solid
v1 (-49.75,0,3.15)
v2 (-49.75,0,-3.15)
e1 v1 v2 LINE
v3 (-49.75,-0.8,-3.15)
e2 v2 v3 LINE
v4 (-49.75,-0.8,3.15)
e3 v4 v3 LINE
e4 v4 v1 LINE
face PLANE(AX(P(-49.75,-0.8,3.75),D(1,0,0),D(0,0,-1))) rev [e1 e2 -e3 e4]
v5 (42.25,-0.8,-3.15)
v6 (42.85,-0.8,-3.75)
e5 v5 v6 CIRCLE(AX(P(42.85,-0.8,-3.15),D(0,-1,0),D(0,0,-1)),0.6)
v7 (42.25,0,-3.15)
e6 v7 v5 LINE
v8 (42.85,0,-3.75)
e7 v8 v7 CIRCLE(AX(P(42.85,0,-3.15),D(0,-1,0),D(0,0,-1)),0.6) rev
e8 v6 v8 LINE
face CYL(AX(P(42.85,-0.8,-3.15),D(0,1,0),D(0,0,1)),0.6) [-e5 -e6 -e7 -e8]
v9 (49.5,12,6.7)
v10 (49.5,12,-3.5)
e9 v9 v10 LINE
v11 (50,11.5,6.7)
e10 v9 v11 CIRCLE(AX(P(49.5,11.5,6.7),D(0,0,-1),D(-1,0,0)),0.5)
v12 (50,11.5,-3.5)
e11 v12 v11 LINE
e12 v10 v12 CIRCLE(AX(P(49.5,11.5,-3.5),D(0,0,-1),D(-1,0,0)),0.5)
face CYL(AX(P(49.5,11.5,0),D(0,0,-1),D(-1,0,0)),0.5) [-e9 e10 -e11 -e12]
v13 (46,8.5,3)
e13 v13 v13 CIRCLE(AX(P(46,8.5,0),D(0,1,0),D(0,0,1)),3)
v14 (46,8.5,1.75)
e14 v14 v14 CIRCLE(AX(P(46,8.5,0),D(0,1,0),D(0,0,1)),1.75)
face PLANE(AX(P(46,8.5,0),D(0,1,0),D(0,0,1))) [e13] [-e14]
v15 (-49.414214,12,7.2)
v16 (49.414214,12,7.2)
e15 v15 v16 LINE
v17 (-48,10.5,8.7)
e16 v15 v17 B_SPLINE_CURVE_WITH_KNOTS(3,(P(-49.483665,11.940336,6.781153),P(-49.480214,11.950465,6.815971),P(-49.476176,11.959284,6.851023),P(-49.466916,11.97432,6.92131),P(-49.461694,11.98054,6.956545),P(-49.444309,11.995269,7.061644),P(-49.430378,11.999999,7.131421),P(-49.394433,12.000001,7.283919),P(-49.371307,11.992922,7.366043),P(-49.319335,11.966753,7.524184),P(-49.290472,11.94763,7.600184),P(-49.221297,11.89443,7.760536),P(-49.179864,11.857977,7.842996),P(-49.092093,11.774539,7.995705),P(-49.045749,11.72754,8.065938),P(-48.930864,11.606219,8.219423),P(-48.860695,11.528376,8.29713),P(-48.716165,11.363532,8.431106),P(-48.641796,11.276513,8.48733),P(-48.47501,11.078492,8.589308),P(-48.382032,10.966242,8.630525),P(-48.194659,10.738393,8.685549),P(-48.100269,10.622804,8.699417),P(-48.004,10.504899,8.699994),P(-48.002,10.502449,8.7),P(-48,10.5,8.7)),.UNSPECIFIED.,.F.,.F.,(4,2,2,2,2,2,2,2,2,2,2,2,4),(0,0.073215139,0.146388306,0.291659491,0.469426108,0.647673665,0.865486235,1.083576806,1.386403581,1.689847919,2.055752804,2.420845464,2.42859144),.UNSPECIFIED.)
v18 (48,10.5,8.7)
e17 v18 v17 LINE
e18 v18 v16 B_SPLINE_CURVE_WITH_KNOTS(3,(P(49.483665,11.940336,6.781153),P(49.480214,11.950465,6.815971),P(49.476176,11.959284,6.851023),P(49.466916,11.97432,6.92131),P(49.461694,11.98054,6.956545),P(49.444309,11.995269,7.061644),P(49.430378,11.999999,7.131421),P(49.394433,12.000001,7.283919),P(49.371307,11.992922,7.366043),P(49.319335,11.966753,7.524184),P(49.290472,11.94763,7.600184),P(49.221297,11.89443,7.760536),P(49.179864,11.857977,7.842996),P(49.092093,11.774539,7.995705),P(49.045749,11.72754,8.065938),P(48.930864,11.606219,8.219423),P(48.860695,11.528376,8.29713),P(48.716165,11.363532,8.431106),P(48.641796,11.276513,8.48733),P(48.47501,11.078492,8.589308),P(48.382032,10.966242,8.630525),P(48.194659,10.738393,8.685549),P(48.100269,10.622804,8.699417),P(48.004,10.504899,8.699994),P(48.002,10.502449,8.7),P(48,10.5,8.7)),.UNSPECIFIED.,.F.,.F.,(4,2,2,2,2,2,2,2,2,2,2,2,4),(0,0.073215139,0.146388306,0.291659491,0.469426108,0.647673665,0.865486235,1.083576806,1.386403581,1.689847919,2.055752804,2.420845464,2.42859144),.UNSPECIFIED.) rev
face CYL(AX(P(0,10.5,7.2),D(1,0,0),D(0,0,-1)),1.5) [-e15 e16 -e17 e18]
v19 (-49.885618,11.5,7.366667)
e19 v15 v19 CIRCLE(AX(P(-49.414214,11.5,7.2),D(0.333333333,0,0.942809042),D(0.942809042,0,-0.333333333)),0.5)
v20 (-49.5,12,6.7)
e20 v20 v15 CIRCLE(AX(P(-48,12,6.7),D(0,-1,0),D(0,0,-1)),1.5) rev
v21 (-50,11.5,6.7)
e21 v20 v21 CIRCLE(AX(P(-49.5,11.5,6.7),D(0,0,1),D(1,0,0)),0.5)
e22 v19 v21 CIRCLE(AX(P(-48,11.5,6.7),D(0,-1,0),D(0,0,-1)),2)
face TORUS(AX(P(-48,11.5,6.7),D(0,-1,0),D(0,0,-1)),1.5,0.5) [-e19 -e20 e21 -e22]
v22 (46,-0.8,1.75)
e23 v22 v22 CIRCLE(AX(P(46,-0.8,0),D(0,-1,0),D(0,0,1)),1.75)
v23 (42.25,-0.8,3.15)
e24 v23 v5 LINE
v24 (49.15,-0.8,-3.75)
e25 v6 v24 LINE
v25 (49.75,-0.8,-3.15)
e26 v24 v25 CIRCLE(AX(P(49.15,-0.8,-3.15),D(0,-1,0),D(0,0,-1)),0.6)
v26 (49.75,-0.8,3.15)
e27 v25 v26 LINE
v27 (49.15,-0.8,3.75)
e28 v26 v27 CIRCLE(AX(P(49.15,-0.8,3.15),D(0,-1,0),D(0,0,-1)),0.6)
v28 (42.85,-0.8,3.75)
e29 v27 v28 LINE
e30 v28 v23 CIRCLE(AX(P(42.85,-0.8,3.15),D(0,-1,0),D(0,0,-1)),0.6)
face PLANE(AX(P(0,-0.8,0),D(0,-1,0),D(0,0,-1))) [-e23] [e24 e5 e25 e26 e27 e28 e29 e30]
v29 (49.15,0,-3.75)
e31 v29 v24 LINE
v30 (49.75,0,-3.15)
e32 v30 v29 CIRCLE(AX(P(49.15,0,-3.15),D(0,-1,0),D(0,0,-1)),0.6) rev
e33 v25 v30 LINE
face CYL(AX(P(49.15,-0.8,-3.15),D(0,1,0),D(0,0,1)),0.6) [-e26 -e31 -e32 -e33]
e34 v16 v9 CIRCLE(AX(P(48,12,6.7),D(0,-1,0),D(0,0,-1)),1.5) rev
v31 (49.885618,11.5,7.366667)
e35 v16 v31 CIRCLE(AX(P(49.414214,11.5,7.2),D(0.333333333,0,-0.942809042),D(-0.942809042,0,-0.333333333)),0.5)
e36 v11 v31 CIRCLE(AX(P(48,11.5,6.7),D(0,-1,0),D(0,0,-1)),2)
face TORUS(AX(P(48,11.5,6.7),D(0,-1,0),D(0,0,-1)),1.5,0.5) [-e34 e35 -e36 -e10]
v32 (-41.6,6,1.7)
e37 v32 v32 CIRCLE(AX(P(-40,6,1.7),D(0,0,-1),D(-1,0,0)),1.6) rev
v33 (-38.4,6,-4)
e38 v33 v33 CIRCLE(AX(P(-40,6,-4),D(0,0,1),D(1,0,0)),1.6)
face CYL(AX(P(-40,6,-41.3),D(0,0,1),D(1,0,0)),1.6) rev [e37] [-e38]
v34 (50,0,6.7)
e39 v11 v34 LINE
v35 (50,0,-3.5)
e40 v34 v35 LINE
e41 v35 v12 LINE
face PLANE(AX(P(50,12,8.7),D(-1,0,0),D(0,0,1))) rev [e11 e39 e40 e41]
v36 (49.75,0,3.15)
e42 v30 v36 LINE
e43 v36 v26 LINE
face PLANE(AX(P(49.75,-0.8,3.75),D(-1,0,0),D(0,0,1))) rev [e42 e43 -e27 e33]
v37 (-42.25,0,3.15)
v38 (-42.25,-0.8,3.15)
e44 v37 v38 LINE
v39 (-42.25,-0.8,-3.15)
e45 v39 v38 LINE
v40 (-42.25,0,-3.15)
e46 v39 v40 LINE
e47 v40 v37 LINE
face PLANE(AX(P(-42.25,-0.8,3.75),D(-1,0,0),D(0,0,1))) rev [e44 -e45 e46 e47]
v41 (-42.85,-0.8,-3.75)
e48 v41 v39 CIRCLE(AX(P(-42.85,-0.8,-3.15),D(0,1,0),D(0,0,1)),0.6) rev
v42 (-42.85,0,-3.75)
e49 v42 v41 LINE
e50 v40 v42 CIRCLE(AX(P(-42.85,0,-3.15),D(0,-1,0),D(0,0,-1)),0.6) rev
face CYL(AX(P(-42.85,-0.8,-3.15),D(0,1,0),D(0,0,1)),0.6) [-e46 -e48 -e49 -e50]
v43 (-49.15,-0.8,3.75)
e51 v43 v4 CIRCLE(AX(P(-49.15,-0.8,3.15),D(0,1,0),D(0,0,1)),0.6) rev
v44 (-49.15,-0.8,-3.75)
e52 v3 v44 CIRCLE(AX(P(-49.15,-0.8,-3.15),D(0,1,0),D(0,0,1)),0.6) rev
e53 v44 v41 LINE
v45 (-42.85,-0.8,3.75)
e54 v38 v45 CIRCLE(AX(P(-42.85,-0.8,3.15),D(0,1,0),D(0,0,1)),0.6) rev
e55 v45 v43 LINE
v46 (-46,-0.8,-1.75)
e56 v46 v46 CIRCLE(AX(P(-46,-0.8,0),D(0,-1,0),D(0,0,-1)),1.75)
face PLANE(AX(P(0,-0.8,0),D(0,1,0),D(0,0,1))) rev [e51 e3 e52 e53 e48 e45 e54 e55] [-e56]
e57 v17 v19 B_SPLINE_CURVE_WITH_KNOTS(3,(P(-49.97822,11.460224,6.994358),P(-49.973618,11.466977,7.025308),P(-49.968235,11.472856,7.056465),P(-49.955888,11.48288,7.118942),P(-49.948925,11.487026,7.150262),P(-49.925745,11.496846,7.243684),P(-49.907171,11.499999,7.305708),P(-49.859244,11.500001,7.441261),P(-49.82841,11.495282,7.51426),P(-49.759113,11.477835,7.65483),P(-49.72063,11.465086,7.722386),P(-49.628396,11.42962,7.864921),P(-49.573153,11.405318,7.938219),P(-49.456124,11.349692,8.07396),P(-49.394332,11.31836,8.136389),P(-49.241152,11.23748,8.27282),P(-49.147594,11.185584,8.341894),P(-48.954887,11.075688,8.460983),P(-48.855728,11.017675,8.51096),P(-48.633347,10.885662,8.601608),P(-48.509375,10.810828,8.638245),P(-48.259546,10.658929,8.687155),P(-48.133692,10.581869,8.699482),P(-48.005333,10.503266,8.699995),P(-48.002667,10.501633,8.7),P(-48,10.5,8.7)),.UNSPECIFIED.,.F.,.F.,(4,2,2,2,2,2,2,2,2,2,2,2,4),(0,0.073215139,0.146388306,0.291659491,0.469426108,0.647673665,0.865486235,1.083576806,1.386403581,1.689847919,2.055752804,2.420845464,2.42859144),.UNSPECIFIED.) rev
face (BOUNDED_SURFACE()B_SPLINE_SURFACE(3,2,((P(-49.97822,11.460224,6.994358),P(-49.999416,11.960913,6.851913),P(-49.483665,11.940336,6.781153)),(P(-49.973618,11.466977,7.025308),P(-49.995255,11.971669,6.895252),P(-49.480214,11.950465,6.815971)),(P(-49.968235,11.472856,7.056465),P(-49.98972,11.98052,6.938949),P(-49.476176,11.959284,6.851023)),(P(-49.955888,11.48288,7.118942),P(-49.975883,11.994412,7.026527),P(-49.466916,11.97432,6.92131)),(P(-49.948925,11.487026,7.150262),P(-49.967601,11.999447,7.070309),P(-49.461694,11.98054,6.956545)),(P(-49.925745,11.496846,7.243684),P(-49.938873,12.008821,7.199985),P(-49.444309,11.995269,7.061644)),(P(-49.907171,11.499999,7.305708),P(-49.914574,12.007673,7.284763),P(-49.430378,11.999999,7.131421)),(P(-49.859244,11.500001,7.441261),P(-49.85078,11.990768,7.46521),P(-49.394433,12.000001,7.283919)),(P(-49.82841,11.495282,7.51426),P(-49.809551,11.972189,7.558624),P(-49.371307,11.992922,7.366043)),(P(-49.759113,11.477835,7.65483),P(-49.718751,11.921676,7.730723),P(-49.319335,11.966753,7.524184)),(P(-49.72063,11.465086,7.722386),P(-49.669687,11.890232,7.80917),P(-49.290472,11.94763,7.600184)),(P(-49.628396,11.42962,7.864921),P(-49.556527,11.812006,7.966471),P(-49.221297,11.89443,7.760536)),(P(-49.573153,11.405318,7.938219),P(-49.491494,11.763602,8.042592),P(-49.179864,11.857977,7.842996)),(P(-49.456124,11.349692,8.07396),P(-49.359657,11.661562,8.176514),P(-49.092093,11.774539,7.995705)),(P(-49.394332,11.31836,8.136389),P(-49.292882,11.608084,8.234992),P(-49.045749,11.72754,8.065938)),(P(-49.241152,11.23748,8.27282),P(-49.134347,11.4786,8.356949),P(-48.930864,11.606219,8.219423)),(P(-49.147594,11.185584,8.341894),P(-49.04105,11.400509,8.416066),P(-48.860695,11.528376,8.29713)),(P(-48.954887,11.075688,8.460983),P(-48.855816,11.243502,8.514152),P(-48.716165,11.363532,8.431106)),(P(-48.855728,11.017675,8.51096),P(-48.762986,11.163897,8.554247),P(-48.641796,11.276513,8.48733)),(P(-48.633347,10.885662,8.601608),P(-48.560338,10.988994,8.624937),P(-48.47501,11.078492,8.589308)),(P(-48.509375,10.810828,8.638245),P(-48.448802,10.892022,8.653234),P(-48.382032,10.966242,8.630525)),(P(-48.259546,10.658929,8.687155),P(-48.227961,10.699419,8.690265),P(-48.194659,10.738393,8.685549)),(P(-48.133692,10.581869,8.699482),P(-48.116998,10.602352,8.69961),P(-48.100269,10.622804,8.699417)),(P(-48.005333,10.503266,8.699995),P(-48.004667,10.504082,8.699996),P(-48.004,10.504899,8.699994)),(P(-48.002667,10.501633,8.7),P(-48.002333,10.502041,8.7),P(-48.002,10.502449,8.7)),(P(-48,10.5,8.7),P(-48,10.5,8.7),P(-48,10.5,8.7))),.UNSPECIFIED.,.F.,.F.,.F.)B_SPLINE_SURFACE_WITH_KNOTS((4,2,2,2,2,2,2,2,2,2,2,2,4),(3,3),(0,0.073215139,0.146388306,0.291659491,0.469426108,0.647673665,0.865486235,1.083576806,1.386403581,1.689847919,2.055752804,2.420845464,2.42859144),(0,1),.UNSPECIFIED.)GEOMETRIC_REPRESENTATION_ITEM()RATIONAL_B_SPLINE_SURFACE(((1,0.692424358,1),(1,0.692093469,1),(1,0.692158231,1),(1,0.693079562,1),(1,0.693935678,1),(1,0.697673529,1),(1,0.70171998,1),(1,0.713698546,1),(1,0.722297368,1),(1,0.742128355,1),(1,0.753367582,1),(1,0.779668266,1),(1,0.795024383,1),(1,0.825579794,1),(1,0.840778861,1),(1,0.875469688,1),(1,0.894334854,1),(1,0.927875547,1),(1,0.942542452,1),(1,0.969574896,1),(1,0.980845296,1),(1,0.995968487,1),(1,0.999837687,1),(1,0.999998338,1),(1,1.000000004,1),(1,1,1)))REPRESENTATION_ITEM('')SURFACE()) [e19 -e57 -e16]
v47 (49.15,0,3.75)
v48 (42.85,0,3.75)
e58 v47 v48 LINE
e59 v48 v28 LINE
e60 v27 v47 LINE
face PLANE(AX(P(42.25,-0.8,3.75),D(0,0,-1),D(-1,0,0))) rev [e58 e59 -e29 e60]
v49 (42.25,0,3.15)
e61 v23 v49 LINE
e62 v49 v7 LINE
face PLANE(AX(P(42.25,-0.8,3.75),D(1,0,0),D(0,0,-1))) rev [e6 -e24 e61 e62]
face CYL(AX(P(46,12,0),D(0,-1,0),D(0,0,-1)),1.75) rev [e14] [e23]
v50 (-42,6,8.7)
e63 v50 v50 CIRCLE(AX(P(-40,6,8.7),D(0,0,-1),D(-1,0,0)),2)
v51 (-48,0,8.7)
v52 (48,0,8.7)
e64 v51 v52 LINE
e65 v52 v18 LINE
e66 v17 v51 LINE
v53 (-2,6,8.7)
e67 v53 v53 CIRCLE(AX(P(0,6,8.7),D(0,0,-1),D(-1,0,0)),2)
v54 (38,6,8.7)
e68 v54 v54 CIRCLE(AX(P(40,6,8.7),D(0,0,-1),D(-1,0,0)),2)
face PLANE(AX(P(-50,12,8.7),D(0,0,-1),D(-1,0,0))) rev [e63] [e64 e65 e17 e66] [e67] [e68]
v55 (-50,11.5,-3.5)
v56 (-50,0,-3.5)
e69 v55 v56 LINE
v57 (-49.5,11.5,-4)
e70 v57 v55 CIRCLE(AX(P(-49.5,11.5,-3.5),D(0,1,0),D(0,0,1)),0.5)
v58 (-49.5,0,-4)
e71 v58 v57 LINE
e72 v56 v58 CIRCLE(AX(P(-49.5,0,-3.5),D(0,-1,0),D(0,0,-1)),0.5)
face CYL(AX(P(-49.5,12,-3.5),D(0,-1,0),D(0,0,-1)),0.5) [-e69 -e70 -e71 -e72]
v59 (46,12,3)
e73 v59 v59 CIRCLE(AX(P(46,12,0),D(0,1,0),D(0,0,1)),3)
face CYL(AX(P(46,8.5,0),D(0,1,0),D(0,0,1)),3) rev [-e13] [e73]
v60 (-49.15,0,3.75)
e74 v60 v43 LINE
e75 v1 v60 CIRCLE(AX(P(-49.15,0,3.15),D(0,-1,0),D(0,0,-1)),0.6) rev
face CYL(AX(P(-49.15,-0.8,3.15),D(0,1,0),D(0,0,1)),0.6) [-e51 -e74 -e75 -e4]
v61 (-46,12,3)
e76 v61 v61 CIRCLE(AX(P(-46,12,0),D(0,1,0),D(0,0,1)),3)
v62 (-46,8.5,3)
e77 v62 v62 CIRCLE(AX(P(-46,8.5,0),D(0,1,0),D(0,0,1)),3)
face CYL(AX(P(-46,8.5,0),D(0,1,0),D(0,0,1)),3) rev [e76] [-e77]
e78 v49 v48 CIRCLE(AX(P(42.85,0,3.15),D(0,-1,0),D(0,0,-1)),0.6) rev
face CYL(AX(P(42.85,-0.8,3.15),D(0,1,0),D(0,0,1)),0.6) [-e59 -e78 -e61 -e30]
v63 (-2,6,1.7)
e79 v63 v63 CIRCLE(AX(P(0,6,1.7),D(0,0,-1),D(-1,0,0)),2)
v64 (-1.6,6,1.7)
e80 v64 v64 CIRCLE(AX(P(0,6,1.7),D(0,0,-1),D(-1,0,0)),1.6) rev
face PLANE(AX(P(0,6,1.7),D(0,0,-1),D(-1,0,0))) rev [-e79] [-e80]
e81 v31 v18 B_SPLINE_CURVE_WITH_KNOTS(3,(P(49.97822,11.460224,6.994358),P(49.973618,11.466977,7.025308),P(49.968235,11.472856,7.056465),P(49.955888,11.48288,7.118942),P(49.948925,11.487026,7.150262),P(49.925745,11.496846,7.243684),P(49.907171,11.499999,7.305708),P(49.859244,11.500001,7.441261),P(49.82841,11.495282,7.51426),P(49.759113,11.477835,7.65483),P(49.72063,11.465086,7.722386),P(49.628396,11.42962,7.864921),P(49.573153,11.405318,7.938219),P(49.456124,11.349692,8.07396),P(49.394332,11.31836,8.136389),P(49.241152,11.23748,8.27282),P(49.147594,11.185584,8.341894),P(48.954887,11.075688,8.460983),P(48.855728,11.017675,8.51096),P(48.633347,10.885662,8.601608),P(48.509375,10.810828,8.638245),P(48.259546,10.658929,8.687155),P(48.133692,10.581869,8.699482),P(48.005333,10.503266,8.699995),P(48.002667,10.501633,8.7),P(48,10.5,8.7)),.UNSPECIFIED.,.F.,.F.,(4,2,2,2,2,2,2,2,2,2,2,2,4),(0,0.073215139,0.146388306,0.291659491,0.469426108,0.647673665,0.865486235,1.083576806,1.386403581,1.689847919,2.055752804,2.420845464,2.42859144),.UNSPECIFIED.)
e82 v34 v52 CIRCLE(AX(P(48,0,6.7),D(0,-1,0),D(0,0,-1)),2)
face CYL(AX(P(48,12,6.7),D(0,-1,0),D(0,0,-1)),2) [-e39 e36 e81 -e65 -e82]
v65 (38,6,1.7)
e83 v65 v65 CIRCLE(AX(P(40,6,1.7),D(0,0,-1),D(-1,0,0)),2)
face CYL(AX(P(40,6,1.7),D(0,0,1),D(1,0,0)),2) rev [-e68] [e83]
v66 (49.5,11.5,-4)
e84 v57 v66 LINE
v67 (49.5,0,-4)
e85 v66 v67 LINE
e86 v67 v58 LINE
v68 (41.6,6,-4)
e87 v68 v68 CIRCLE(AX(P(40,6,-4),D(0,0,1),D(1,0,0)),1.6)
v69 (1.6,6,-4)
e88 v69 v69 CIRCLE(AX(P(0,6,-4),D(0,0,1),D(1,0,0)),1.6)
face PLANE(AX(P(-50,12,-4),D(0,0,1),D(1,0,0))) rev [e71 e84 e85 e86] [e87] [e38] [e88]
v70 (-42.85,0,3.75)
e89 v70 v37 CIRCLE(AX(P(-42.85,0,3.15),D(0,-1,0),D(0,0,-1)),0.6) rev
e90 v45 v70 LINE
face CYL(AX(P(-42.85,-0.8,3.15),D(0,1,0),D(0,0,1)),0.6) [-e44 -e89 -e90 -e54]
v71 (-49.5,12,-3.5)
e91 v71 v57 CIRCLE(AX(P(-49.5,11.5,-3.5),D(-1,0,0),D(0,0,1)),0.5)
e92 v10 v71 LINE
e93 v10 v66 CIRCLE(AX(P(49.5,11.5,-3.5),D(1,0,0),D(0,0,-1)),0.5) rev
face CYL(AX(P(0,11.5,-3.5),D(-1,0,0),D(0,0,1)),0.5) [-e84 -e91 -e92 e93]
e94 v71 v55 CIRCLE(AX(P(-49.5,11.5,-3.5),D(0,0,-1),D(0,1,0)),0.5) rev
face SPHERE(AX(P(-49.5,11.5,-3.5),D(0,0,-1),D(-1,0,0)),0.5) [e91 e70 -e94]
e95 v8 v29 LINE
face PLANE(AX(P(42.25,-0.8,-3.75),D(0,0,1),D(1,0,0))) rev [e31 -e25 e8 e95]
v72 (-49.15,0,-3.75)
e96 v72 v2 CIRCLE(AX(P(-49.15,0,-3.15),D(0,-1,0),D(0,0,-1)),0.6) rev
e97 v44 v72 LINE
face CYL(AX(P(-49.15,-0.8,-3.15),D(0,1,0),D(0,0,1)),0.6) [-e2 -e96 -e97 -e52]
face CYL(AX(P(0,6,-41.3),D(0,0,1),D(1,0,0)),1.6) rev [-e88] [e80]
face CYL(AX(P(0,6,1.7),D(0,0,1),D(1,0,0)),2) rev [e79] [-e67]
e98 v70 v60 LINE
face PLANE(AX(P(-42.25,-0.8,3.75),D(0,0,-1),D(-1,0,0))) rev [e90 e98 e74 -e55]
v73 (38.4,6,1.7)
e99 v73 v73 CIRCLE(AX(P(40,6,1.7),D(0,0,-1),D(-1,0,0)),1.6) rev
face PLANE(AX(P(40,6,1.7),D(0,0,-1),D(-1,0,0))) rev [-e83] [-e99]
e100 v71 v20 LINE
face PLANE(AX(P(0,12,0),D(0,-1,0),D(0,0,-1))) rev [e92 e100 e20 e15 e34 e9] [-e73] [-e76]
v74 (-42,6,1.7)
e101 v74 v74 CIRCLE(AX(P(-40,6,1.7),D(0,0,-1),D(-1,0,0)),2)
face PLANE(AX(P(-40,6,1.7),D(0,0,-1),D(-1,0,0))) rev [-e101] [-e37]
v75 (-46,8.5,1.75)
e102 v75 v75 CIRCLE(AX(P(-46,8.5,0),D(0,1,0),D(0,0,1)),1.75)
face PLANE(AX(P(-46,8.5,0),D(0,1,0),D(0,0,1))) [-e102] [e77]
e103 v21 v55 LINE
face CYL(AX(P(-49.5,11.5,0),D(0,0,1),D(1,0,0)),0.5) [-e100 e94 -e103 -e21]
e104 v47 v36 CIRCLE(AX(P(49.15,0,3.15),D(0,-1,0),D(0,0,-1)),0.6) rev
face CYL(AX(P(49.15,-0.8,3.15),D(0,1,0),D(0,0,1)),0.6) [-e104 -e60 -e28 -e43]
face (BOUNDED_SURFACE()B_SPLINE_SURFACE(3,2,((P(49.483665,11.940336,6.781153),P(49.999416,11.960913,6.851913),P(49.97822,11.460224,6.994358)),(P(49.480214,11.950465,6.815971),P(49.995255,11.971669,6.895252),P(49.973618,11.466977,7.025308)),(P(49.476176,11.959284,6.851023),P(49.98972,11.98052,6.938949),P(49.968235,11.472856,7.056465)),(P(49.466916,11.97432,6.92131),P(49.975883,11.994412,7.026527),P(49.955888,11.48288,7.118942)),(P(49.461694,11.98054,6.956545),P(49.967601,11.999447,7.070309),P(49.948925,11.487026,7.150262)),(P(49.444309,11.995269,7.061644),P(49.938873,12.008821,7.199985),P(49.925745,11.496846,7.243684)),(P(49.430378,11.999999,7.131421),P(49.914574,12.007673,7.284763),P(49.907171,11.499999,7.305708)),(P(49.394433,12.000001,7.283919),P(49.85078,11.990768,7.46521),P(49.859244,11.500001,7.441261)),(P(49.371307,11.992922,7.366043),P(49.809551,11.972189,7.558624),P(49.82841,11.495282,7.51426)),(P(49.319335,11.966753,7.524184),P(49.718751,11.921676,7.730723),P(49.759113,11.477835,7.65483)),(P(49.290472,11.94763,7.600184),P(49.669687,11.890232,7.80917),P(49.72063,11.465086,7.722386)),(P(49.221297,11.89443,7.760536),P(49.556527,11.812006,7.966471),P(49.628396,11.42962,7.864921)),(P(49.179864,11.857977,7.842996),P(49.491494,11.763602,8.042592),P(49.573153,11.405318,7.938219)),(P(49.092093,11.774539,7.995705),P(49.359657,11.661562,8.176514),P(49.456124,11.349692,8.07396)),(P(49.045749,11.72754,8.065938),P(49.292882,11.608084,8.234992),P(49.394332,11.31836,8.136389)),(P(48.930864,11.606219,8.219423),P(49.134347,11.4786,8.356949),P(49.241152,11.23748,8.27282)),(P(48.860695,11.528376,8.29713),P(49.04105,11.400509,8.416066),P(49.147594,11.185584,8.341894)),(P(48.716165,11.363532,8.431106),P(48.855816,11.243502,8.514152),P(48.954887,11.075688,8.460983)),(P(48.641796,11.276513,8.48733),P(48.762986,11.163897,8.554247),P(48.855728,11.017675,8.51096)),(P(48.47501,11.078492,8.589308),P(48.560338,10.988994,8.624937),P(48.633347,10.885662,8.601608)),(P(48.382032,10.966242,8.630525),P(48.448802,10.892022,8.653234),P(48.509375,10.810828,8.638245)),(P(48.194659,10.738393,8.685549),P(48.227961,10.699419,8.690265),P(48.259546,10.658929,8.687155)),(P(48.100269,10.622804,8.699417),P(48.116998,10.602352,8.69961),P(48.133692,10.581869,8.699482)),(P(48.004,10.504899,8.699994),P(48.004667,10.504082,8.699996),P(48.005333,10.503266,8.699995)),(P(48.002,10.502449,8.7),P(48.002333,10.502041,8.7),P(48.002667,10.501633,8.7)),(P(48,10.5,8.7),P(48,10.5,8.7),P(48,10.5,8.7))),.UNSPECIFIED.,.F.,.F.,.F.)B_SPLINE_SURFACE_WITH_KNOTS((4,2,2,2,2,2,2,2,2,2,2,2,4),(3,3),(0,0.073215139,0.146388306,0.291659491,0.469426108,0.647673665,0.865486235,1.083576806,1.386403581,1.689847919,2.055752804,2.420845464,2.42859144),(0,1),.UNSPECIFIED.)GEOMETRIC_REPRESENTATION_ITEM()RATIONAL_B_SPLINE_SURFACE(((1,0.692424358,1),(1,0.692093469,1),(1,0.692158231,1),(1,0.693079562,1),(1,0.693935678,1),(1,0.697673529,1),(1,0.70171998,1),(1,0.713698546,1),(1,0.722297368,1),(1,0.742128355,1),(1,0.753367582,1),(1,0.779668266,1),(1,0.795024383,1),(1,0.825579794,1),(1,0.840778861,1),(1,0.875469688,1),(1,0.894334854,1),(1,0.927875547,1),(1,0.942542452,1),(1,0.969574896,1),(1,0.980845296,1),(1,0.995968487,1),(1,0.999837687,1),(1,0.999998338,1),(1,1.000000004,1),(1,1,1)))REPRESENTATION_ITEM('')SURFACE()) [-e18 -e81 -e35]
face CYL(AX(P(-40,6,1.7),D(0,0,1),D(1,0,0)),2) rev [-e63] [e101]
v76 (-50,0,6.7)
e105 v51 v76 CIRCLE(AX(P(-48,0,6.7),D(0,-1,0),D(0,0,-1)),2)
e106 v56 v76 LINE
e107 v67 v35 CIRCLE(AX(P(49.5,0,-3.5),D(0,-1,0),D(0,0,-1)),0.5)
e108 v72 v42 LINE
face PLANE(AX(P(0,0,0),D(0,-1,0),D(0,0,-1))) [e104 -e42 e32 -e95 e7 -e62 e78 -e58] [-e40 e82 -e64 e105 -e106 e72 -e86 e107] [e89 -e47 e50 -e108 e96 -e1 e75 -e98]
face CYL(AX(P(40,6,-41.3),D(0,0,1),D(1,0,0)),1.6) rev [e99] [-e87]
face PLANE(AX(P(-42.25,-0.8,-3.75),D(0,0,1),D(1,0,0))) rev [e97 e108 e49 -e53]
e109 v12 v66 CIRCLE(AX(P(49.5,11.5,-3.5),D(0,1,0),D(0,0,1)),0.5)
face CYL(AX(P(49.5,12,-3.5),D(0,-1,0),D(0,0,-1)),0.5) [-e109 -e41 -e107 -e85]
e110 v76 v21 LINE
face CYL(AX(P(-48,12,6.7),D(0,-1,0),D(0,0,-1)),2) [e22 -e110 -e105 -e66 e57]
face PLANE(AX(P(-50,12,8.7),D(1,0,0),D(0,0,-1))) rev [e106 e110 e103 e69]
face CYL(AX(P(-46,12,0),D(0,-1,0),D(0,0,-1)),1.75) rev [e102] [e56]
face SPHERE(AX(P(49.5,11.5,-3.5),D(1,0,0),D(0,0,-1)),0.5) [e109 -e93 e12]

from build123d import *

# Parameters (mm, degrees)
SKETCH1_W           = 100
SKETCH1_H           = 12.7
SKETCH1_R           = 1.75
BOSS_EXTRUDE1_DEPTH = 12
SKETCH2_R           = 3
CUT_EXTRUDE1_DEPTH  = 3.5
SKETCH3_R           = 1.6
CUT_EXTRUDE2_DEPTH  = 50
SKETCH4_R           = 2
CUT_EXTRUDE3_DEPTH  = 7
FILLET1_R           = 2
FILLET2_R           = 1.5
BOSS_EXTRUDE2_START = 0.8
SKETCH5_W           = 7.5
SKETCH5_H           = 7.5
SKETCH5_R           = 1.75
BOSS_EXTRUDE2_DEPTH = 0.8
FILLET3_R           = 0.6
FILLET4_R           = 0.5


with BuildPart() as part:
    # Sketch1 → Boss-Extrude1 (new body)
    with BuildSketch(Plane(origin=(0, 0, 0), x_dir=(1, 0, 0), z_dir=(0, 1, 0))):
        with Locations((0, -2.35)):
            Rectangle(SKETCH1_W, SKETCH1_H)
        with Locations(Location((46, 0, 0), (0, 0, 270))):
            Circle(SKETCH1_R, mode=Mode.SUBTRACT)
        with Locations(Location((-46, 0, 0), (0, 0, 90))):
            Circle(SKETCH1_R, mode=Mode.SUBTRACT)
    extrude(amount=BOSS_EXTRUDE1_DEPTH)

    # Sketch2 → Cut-Extrude1 (cut)
    with BuildSketch(Plane(origin=(0, 12, 0), x_dir=(1, 0, 0), z_dir=(0, 1, 0))):
        with Locations(Location((46, 0, 0), (0, 0, 270))):
            Circle(SKETCH2_R)
        with Locations(Location((-46, 0, 0), (0, 0, 270))):
            Circle(SKETCH2_R)
    extrude(amount=-CUT_EXTRUDE1_DEPTH, mode=Mode.SUBTRACT)

    # Sketch3 → Cut-Extrude2 (cut)
    with BuildSketch(Plane.XY.offset(8.7)):
        with Locations((40, 6)):
            Circle(SKETCH3_R)
        with Locations((0, 6)):
            Circle(SKETCH3_R)
        with Locations((-40, 6)):
            Circle(SKETCH3_R)
    extrude(amount=-CUT_EXTRUDE2_DEPTH, mode=Mode.SUBTRACT)

    # Sketch4 → Cut-Extrude3 (cut)
    with BuildSketch(Plane(origin=(0, 0, 8.7), x_dir=(-1, 0, 0), z_dir=(0, 0, -1))):
        with Locations((40, 6)):
            Circle(SKETCH4_R)
        with Locations((0, 6)):
            Circle(SKETCH4_R)
        with Locations((-40, 6)):
            Circle(SKETCH4_R)
    extrude(amount=CUT_EXTRUDE3_DEPTH, mode=Mode.SUBTRACT)

    # Fillet1
    fillet1_edges = [part.edges().sort_by_distance(p)[0] for p in [
        (50, 6, 8.7),
        (-50, 6, 8.7),
    ]]
    fillet(fillet1_edges, radius=FILLET1_R)

    # Fillet2
    # the kernel refuses this fillet: 1.5 mm, written as the material it takes off along each edge
    with BuildSketch(Plane(origin=(-51.75, 12, 8.7), x_dir=(0, -1, 0), z_dir=(1, 0, 0))) as fillet2_piece_1:
        with BuildLine():
            CenterArc((FILLET2_R, FILLET2_R), FILLET2_R, 180, 90)
            Line((0, FILLET2_R), (0, 0))
            Line((0, 0), (FILLET2_R, 0))
        make_face()
    extrude(amount=103.5, mode=Mode.SUBTRACT)

    # Sketch5 → Boss-Extrude2 (add)
    # profile 1 of 2: a face of its own
    with BuildSketch(Plane.XZ.offset(BOSS_EXTRUDE2_START)):
        with Locations((-46, 0)):
            Rectangle(SKETCH5_W, SKETCH5_H)
        with Locations(Location((-46, 0, 0), (0, 0, 270))):
            Circle(SKETCH5_R, mode=Mode.SUBTRACT)
    # profile 2 of 2: a face of its own
    with BuildSketch(Plane.XZ.offset(BOSS_EXTRUDE2_START)):
        with Locations((46, 0)):
            Rectangle(SKETCH5_W, SKETCH5_H)
        with Locations(Location((46, 0, 0), (0, 0, 90))):
            Circle(SKETCH5_R, mode=Mode.SUBTRACT)
    extrude(amount=-BOSS_EXTRUDE2_DEPTH)

    # Fillet3
    fillet3_edges = [part.edges().sort_by_distance(p)[0] for p in [
        (42.25, -0.4, 3.75),
        (42.25, -0.4, -3.75),
        (49.75, -0.4, -3.75),
        (49.75, -0.4, 3.75),
        (-49.75, -0.4, 3.75),
        (-49.75, -0.4, -3.75),
        (-42.25, -0.4, -3.75),
        (-42.25, -0.4, 3.75),
    ]]
    fillet(fillet3_edges, radius=FILLET3_R)

    # Fillet4
    fillet4_edges = [part.edges().sort_by_distance(p)[0] for p in [
        (-50, 12, 1.35),
        (50, 12, 1.35),
        (-49.984059393, 12, 6.952008585),
        (-50, 6, -4),
        (50, 6, -4),
        (49.984059393, 12, 6.952008585),
        (49.135184903, 11.467090552, 8.346619324),
        (-49.135184903, 11.467090552, 8.346619324),
        (0, 12, -4),
    ]]
    fillet(fillet4_edges, radius=FILLET4_R)


solid = part.part
